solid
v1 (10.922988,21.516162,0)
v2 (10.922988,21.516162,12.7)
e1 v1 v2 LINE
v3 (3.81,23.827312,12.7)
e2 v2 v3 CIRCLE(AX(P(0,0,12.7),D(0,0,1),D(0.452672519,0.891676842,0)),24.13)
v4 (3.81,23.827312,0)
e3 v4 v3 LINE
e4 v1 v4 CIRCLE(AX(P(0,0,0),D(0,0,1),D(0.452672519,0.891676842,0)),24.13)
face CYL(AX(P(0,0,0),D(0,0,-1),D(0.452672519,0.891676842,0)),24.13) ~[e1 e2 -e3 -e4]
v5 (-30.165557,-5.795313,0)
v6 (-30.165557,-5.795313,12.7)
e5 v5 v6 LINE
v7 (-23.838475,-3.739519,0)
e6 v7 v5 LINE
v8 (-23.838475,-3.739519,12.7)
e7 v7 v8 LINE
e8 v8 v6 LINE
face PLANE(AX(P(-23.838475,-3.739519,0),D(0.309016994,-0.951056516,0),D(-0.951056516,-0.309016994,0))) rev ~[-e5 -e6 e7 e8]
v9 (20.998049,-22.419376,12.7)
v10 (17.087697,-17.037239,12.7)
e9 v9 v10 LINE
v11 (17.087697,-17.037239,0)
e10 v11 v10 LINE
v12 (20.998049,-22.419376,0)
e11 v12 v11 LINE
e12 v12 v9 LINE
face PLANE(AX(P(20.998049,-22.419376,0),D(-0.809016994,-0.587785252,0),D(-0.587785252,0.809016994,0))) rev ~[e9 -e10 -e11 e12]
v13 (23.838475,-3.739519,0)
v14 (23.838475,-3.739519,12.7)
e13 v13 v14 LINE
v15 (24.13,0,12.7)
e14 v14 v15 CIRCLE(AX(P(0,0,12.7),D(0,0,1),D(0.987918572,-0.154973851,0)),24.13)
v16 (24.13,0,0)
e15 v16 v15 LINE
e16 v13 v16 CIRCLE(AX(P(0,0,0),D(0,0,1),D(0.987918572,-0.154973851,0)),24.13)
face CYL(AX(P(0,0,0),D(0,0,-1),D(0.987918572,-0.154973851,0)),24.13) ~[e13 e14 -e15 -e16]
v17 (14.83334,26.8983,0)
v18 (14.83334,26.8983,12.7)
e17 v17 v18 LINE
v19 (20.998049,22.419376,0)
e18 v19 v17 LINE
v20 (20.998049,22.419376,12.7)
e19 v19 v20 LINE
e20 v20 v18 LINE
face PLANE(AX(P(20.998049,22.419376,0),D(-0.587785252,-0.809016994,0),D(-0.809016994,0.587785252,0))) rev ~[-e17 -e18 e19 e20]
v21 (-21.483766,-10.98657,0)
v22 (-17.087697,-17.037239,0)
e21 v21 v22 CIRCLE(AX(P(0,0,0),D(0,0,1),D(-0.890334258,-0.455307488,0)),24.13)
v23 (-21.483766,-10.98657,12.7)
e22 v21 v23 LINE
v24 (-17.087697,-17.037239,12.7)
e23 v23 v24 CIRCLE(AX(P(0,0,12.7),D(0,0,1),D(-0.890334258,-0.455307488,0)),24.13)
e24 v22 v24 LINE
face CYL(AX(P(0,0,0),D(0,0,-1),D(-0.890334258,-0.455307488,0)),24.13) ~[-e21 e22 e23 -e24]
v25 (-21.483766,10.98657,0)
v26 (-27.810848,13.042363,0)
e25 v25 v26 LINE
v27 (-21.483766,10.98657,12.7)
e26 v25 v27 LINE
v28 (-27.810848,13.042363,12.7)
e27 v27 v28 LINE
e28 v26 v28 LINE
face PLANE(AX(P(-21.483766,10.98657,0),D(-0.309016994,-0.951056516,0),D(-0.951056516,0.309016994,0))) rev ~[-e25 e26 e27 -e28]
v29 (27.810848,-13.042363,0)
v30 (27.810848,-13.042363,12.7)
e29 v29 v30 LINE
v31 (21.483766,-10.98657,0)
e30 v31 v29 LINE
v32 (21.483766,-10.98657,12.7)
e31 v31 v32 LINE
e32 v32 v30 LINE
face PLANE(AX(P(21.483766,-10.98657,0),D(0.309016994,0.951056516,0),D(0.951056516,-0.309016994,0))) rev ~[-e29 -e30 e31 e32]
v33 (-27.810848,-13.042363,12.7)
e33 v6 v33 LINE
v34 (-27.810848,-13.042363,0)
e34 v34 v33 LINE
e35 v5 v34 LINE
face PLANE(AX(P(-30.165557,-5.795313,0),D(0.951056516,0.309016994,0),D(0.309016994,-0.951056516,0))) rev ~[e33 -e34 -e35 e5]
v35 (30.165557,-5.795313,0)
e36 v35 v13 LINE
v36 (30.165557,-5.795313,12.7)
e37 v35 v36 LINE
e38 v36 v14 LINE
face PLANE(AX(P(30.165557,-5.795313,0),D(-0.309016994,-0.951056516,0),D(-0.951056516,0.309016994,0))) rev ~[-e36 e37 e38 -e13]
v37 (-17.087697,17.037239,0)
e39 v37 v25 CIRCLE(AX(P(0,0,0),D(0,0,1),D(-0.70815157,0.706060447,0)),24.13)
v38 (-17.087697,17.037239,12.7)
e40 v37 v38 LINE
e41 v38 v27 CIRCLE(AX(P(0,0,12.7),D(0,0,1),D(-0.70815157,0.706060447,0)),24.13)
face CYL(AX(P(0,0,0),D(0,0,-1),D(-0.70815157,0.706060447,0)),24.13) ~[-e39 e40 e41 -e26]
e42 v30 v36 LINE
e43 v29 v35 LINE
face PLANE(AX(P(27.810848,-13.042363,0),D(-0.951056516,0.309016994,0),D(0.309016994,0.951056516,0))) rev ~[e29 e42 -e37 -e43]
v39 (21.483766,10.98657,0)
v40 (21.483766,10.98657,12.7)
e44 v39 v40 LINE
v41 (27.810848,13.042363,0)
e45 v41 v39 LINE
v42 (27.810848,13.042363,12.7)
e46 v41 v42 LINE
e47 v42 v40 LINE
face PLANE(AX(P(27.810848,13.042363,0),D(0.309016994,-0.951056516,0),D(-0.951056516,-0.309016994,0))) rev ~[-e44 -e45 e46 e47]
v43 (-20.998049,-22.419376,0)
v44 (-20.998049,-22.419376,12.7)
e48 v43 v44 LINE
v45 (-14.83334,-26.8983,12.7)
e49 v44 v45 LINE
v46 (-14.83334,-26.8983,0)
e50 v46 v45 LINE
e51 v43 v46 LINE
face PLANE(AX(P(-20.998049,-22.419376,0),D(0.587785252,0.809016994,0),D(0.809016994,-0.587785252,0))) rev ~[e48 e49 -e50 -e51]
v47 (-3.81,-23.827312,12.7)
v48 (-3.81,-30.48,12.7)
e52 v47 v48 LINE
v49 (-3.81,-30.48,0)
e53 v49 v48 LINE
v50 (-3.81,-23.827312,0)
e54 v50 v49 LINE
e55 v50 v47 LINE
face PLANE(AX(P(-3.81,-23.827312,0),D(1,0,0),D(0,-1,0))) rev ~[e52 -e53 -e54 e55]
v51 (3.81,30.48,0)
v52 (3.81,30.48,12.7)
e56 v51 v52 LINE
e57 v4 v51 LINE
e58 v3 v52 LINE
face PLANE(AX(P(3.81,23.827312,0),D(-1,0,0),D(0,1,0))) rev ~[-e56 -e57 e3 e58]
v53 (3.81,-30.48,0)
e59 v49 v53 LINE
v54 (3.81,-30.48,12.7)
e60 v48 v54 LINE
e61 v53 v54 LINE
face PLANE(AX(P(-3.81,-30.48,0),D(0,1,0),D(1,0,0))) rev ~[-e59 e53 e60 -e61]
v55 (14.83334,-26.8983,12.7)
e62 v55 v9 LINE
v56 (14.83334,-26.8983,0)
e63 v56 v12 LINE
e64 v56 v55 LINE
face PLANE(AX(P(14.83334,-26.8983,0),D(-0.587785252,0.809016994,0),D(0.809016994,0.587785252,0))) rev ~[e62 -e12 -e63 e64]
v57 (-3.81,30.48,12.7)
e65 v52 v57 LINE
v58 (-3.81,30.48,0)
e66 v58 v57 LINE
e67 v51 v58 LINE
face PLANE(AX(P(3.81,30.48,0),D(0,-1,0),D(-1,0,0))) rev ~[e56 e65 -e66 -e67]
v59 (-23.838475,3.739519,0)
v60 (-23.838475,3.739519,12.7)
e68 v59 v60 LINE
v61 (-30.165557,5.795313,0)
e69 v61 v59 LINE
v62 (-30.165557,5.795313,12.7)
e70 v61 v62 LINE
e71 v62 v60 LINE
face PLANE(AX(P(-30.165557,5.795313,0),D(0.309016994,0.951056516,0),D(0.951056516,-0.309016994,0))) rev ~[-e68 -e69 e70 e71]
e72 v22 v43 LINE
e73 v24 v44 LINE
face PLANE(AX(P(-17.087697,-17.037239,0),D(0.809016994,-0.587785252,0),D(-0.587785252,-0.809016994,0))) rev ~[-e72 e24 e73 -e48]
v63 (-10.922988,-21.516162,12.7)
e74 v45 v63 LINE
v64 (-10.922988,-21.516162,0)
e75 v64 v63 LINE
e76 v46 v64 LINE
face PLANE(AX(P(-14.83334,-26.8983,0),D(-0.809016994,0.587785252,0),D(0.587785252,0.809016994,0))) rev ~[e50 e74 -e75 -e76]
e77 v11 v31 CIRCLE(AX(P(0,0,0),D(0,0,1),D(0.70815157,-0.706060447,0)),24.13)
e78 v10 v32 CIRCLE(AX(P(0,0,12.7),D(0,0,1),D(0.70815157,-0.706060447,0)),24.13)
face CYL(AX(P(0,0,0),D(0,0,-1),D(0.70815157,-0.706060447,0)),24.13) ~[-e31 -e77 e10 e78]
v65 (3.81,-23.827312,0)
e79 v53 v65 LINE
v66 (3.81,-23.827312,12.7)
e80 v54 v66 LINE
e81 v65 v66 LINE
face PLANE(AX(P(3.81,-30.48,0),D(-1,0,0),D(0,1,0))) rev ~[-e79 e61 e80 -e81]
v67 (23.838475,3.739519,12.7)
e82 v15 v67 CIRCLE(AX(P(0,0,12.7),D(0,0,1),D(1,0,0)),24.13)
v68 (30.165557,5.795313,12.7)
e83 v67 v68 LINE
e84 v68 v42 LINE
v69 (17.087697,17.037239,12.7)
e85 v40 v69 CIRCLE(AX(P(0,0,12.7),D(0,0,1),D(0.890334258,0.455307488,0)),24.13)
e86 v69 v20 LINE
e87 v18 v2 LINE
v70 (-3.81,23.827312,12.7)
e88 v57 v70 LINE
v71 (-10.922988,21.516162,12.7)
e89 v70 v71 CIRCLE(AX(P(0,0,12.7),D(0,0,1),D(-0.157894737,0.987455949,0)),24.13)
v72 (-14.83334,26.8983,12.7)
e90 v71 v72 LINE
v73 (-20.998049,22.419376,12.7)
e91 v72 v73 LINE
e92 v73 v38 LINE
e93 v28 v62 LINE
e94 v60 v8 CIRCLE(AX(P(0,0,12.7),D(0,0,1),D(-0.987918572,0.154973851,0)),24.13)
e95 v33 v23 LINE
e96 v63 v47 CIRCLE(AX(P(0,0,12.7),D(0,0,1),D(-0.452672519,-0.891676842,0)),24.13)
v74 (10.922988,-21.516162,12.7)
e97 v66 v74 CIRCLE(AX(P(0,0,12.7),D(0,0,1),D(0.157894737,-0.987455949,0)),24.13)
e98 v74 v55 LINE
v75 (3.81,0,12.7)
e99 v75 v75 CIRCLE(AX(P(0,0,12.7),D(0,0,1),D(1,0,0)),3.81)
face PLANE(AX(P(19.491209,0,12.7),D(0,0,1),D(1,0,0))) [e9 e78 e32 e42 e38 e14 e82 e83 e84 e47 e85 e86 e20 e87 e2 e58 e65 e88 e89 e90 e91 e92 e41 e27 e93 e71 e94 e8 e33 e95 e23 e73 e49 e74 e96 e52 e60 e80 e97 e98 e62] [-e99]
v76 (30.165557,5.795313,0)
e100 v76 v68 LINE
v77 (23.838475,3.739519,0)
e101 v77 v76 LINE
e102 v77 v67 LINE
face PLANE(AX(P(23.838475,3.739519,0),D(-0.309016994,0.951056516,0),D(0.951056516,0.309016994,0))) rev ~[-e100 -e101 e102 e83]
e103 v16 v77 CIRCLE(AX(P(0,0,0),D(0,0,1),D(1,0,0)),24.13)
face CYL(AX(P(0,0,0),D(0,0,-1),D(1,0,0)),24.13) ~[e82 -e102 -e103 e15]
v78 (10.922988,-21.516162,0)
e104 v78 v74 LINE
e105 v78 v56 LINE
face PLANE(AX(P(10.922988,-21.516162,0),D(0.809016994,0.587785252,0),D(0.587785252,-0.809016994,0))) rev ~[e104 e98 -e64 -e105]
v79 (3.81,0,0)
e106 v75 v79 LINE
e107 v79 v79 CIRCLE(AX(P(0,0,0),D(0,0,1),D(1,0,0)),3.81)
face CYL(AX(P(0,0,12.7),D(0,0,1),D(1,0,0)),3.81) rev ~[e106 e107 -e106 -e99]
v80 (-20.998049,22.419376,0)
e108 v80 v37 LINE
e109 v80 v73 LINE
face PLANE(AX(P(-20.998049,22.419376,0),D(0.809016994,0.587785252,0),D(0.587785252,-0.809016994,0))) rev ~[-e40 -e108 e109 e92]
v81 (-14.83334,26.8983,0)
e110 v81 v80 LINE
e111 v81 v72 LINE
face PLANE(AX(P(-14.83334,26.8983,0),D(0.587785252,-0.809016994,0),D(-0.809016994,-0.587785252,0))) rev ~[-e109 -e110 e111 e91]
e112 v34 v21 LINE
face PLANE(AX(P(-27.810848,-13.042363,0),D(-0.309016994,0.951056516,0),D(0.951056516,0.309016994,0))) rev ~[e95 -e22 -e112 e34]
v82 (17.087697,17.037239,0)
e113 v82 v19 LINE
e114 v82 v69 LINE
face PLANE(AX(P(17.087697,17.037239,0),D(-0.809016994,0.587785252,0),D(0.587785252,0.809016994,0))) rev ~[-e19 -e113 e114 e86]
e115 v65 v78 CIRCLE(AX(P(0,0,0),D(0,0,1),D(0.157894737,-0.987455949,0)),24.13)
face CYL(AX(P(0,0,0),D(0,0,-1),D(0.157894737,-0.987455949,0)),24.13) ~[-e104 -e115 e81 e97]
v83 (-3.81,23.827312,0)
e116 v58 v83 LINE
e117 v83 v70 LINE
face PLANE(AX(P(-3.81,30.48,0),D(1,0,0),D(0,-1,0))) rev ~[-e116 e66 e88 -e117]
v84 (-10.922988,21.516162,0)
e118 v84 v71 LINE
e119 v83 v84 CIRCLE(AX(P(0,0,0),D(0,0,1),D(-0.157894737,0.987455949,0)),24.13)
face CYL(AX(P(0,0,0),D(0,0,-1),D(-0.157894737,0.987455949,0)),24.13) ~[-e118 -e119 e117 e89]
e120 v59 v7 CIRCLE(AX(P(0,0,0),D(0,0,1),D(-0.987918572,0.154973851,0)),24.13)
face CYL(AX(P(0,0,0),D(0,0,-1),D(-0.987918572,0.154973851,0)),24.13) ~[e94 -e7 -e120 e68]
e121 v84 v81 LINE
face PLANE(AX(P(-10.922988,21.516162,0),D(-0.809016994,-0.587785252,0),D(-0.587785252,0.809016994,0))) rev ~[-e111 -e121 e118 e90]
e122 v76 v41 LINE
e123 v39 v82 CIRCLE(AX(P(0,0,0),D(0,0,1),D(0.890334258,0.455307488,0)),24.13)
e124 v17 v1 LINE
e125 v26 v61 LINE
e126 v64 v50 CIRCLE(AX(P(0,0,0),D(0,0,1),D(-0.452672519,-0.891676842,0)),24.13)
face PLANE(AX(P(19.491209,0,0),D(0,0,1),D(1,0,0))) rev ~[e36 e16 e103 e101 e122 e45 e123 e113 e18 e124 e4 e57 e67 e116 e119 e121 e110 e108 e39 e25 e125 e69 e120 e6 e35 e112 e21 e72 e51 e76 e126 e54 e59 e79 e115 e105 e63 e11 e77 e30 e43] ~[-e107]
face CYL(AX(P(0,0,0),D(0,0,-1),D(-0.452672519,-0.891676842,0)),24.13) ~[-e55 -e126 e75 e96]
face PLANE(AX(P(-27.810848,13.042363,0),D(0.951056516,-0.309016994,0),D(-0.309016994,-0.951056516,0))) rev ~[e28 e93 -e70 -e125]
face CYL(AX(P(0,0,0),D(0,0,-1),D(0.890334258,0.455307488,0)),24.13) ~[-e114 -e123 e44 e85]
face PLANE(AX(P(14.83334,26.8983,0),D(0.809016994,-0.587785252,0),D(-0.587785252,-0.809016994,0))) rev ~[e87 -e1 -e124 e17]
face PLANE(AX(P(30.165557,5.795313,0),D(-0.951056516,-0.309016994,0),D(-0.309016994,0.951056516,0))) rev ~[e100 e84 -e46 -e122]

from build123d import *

# Parameters (mm, degrees)
F1_DEPTH = 12.7
F2_R     = 3.81
F3_DEPTH = 25.4


# Not quite as in the source:
# - a feature names something its author has since deleted; it is built from what else it names


with BuildPart() as f1:
    # F0 (on Top) → F1 (new body)
    with BuildSketch(Plane.XY):
        with BuildLine():
            ThreePointArc((23.8384751489, -3.7395190297), (24.0570083899, -1.8754325709), (24.13, 0))
            ThreePointArc((24.13, 0), (24.0570083899, 1.8754325709), (23.8384751489, 3.7395190297))
            Line((23.8384751489, 3.7395190297), (12.3294189943, 0))
            Line((12.3294189943, 0), (23.8384751489, -3.7395190297))
        make_face()
        with BuildLine():
            Line((12.3294189943, 0), (23.8384751489, 3.7395190297))
            ThreePointArc((23.8384751489, 3.7395190297), (22.9489937382, 7.4565800743), (21.4837656518, 10.9865696839))
            Line((21.4837656518, 10.9865696839), (9.9747094971, 7.2470506542))
            Line((9.9747094971, 7.2470506542), (6.1647094971, 2.0030355372))
            Line((6.1647094971, 2.0030355372), (12.3294189943, 0))
        make_face()
        with BuildLine():
            ThreePointArc((21.4837656518, 10.9865696839), (22.9489937382, 7.4565800743), (23.8384751489, 3.7395190297))
            Line((23.8384751489, 3.7395190297), (30.1655573652, 5.7953126615))
            Line((30.1655573652, 5.7953126615), (27.8108478681, 13.0423633156))
            Line((27.8108478681, 13.0423633156), (21.4837656518, 10.9865696839))
        make_face()
        with BuildLine():
            Line((30.1655573652, -5.7953126615), (23.8384751489, -3.7395190297))
            ThreePointArc((23.8384751489, -3.7395190297), (22.9489937382, -7.4565800743), (21.4837656518, -10.9865696839))
            Line((21.4837656518, -10.9865696839), (27.8108478681, -13.0423633156))
            Line((27.8108478681, -13.0423633156), (30.1655573652, -5.7953126615))
        make_face()
        with BuildLine():
            ThreePointArc((21.4837656518, -10.9865696839), (22.9489937382, -7.4565800743), (23.8384751489, -3.7395190297))
            Line((23.8384751489, -3.7395190297), (12.3294189943, 0))
            Line((12.3294189943, 0), (6.1647094971, -2.0030355372))
            Line((6.1647094971, -2.0030355372), (9.9747094971, -7.2470506542))
            Line((9.9747094971, -7.2470506542), (21.4837656518, -10.9865696839))
        make_face()
        with BuildLine():
            Line((9.9747094971, 7.2470506542), (21.4837656518, 10.9865696839))
            ThreePointArc((21.4837656518, 10.9865696839), (19.5215800743, 14.1832581378), (17.0876973792, 17.0372385755))
            Line((17.0876973792, 17.0372385755), (9.9747094971, 7.2470506542))
        make_face()
        with BuildLine():
            ThreePointArc((17.0876973792, -17.0372385755), (19.5215800743, -14.1832581378), (21.4837656518, -10.9865696839))
            Line((21.4837656518, -10.9865696839), (9.9747094971, -7.2470506542))
            Line((9.9747094971, -7.2470506542), (17.0876973792, -17.0372385755))
        make_face()
        with BuildLine():
            Line((9.9747094971, 7.2470506542), (17.0876973792, 17.0372385755))
            ThreePointArc((17.0876973792, 17.0372385755), (14.1832581378, 19.5215800743), (10.922987882, 21.516162198))
            Line((10.922987882, 21.516162198), (3.81, 11.7259742766))
            Line((3.81, 11.7259742766), (3.81, 5.244015117))
            Line((3.81, 5.244015117), (9.9747094971, 7.2470506542))
        make_face()
        with BuildLine():
            ThreePointArc((10.922987882, 21.516162198), (14.1832581378, 19.5215800743), (17.0876973792, 17.0372385755))
            Line((17.0876973792, 17.0372385755), (20.9980492384, 22.4193761773))
            Line((20.9980492384, 22.4193761773), (14.8333397413, 26.8982997998))
            Line((14.8333397413, 26.8982997998), (10.922987882, 21.516162198))
        make_face()
        with BuildLine():
            Line((20.9980492384, -22.4193761773), (17.0876973792, -17.0372385755))
            ThreePointArc((17.0876973792, -17.0372385755), (14.1832581378, -19.5215800743), (10.922987882, -21.516162198))
            Line((10.922987882, -21.516162198), (14.8333397413, -26.8982997998))
            Line((14.8333397413, -26.8982997998), (20.9980492384, -22.4193761773))
        make_face()
        with BuildLine():
            ThreePointArc((10.922987882, -21.516162198), (14.1832581378, -19.5215800743), (17.0876973792, -17.0372385755))
            Line((17.0876973792, -17.0372385755), (9.9747094971, -7.2470506542))
            Line((9.9747094971, -7.2470506542), (3.81, -5.244015117))
            Line((3.81, -5.244015117), (3.81, -11.7259742766))
            Line((3.81, -11.7259742766), (10.922987882, -21.516162198))
        make_face()
        with BuildLine():
            Line((3.81, 11.7259742766), (10.922987882, 21.516162198))
            ThreePointArc((10.922987882, 21.516162198), (7.4565800743, 22.9489937382), (3.81, 23.8273120599))
            Line((3.81, 23.8273120599), (3.81, 11.7259742766))
        make_face()
        with BuildLine():
            ThreePointArc((3.81, -23.8273120599), (7.4565800743, -22.9489937382), (10.922987882, -21.516162198))
            Line((10.922987882, -21.516162198), (3.81, -11.7259742766))
            Line((3.81, -11.7259742766), (3.81, -23.8273120599))
        make_face()
        with BuildLine():
            Line((3.81, 11.7259742766), (3.81, 23.8273120599))
            ThreePointArc((3.81, 23.8273120599), (0, 24.13), (-3.81, 23.8273120599))
            Line((-3.81, 23.8273120599), (-3.81, 11.7259742766))
            Line((-3.81, 11.7259742766), (0, 6.4819591596))
            Line((0, 6.4819591596), (3.81, 11.7259742766))
        make_face()
        with BuildLine():
            ThreePointArc((-3.81, 23.8273120599), (0, 24.13), (3.81, 23.8273120599))
            Line((3.81, 23.8273120599), (3.81, 30.48))
            Line((3.81, 30.48), (-3.81, 30.48))
            Line((-3.81, 30.48), (-3.81, 23.8273120599))
        make_face()
        with BuildLine():
            Line((3.81, -30.48), (3.81, -23.8273120599))
            ThreePointArc((3.81, -23.8273120599), (0, -24.13), (-3.81, -23.8273120599))
            Line((-3.81, -23.8273120599), (-3.81, -30.48))
            Line((-3.81, -30.48), (3.81, -30.48))
        make_face()
        with BuildLine():
            ThreePointArc((-3.81, -23.8273120599), (0, -24.13), (3.81, -23.8273120599))
            Line((3.81, -23.8273120599), (3.81, -11.7259742766))
            Line((3.81, -11.7259742766), (0, -6.4819591596))
            Line((0, -6.4819591596), (-3.81, -11.7259742766))
            Line((-3.81, -11.7259742766), (-3.81, -23.8273120599))
        make_face()
        with BuildLine():
            Line((-3.81, 11.7259742766), (-3.81, 23.8273120599))
            ThreePointArc((-3.81, 23.8273120599), (-7.4565800743, 22.9489937382), (-10.922987882, 21.516162198))
            Line((-10.922987882, 21.516162198), (-3.81, 11.7259742766))
        make_face()
        with BuildLine():
            ThreePointArc((-10.922987882, -21.516162198), (-7.4565800743, -22.9489937382), (-3.81, -23.8273120599))
            Line((-3.81, -23.8273120599), (-3.81, -11.7259742766))
            Line((-3.81, -11.7259742766), (-10.922987882, -21.516162198))
        make_face()
        with BuildLine():
            Line((-3.81, 11.7259742766), (-10.922987882, 21.516162198))
            ThreePointArc((-10.922987882, 21.516162198), (-14.1832581378, 19.5215800743), (-17.0876973792, 17.0372385755))
            Line((-17.0876973792, 17.0372385755), (-9.9747094971, 7.2470506542))
            Line((-9.9747094971, 7.2470506542), (-3.81, 5.244015117))
            Line((-3.81, 5.244015117), (-3.81, 11.7259742766))
        make_face()
        with BuildLine():
            ThreePointArc((-17.0876973792, 17.0372385755), (-14.1832581378, 19.5215800743), (-10.922987882, 21.516162198))
            Line((-10.922987882, 21.516162198), (-14.8333397413, 26.8982997998))
            Line((-14.8333397413, 26.8982997998), (-20.9980492384, 22.4193761773))
            Line((-20.9980492384, 22.4193761773), (-17.0876973792, 17.0372385755))
        make_face()
        with BuildLine():
            Line((-14.8333397413, -26.8982997998), (-10.922987882, -21.516162198))
            ThreePointArc((-10.922987882, -21.516162198), (-14.1832581378, -19.5215800743), (-17.0876973792, -17.0372385755))
            Line((-17.0876973792, -17.0372385755), (-20.9980492384, -22.4193761773))
            Line((-20.9980492384, -22.4193761773), (-14.8333397413, -26.8982997998))
        make_face()
        with BuildLine():
            ThreePointArc((-17.0876973792, -17.0372385755), (-14.1832581378, -19.5215800743), (-10.922987882, -21.516162198))
            Line((-10.922987882, -21.516162198), (-3.81, -11.7259742766))
            Line((-3.81, -11.7259742766), (-3.81, -5.244015117))
            Line((-3.81, -5.244015117), (-9.9747094971, -7.2470506542))
            Line((-9.9747094971, -7.2470506542), (-17.0876973792, -17.0372385755))
        make_face()
        with BuildLine():
            Line((-9.9747094971, 7.2470506542), (-17.0876973792, 17.0372385755))
            ThreePointArc((-17.0876973792, 17.0372385755), (-19.5215800743, 14.1832581378), (-21.4837656518, 10.9865696839))
            Line((-21.4837656518, 10.9865696839), (-9.9747094971, 7.2470506542))
        make_face()
        with BuildLine():
            ThreePointArc((-21.4837656518, -10.9865696839), (-19.5215800743, -14.1832581378), (-17.0876973792, -17.0372385755))
            Line((-17.0876973792, -17.0372385755), (-9.9747094971, -7.2470506542))
            Line((-9.9747094971, -7.2470506542), (-21.4837656518, -10.9865696839))
        make_face()
        with BuildLine():
            Line((-9.9747094971, 7.2470506542), (-21.4837656518, 10.9865696839))
            ThreePointArc((-21.4837656518, 10.9865696839), (-22.9489937382, 7.4565800743), (-23.8384751489, 3.7395190297))
            Line((-23.8384751489, 3.7395190297), (-12.3294189943, 0))
            Line((-12.3294189943, 0), (-6.1647094971, 2.0030355372))
            Line((-6.1647094971, 2.0030355372), (-9.9747094971, 7.2470506542))
        make_face()
        with BuildLine():
            ThreePointArc((-23.8384751489, 3.7395190297), (-22.9489937382, 7.4565800743), (-21.4837656518, 10.9865696839))
            Line((-21.4837656518, 10.9865696839), (-27.8108478681, 13.0423633156))
            Line((-27.8108478681, 13.0423633156), (-30.1655573652, 5.7953126615))
            Line((-30.1655573652, 5.7953126615), (-23.8384751489, 3.7395190297))
        make_face()
        with BuildLine():
            Line((-27.8108478681, -13.0423633156), (-21.4837656518, -10.9865696839))
            ThreePointArc((-21.4837656518, -10.9865696839), (-22.9489937382, -7.4565800743), (-23.8384751489, -3.7395190297))
            Line((-23.8384751489, -3.7395190297), (-30.1655573652, -5.7953126615))
            Line((-30.1655573652, -5.7953126615), (-27.8108478681, -13.0423633156))
        make_face()
        with BuildLine():
            ThreePointArc((-23.8384751489, -3.7395190297), (-22.9489937382, -7.4565800743), (-21.4837656518, -10.9865696839))
            Line((-21.4837656518, -10.9865696839), (-9.9747094971, -7.2470506542))
            Line((-9.9747094971, -7.2470506542), (-6.1647094971, -2.0030355372))
            Line((-6.1647094971, -2.0030355372), (-12.3294189943, 0))
            Line((-12.3294189943, 0), (-23.8384751489, -3.7395190297))
        make_face()
        with BuildLine():
            Line((-12.3294189943, 0), (-23.8384751489, 3.7395190297))
            ThreePointArc((-23.8384751489, 3.7395190297), (-24.13, 0), (-23.8384751489, -3.7395190297))
            Line((-23.8384751489, -3.7395190297), (-12.3294189943, 0))
        make_face()
        Polygon((0, -6.4819591596), (1.4552905029, -4.4789236225), (0, -4.0060710743), (-1.4552905029, -4.4789236225), align=None)
        Polygon((-3.81, -5.244015117), (-1.4552905029, -4.4789236225), (-2.3547094971, -3.2409795798), (-3.81, -2.7681270317), align=None)
        Polygon((-3.81, -2.7681270317), (-3.81, -1.2379440426), (-4.7094189943, 0), (-6.1647094971, -2.0030355372), align=None)
        Polygon((-3.81, 1.2379440426), (-3.81, 2.7681270317), (-6.1647094971, 2.0030355372), (-4.7094189943, 0), align=None)
        Polygon((3.81, -5.244015117), (3.81, -2.7681270317), (2.3547094971, -3.2409795798), (1.4552905029, -4.4789236225), align=None)
        Polygon((3.81, -2.7681270317), (6.1647094971, -2.0030355372), (4.7094189943, 0), (3.81, -1.2379440426), align=None)
        Polygon((6.1647094971, -2.0030355372), (12.3294189943, 0), (6.1647094971, 2.0030355372), (4.7094189943, 0), align=None)
        Polygon((9.9747094971, -7.2470506542), (6.1647094971, -2.0030355372), (3.81, -2.7681270317), (3.81, -5.244015117), align=None)
        Polygon((2.3547094971, -3.2409795798), (3.81, -2.7681270317), (3.81, -1.2379440426), (3.0823547486, -2.2394618112), align=None)
        Polygon((3.81, -11.7259742766), (3.81, -5.244015117), (1.4552905029, -4.4789236225), (0, -6.4819591596), align=None)
        Polygon((1.4552905029, -4.4789236225), (2.3547094971, -3.2409795798), (1.1773547486, -3.6235253271), (0, -4.0060710743), align=None)
        Polygon((-3.81, -11.7259742766), (0, -6.4819591596), (-1.4552905029, -4.4789236225), (-3.81, -5.244015117), align=None)
        Polygon((-1.4552905029, -4.4789236225), (0, -4.0060710743), (-1.1773547486, -3.6235253271), (-2.3547094971, -3.2409795798), align=None)
        Polygon((-9.9747094971, -7.2470506542), (-3.81, -5.244015117), (-3.81, -2.7681270317), (-6.1647094971, -2.0030355372), align=None)
        Polygon((-3.81, -2.7681270317), (-2.3547094971, -3.2409795798), (-3.0823547486, -2.2394618112), (-3.81, -1.2379440426), align=None)
        Polygon((-4.7094189943, 0), (-6.1647094971, 2.0030355372), (-12.3294189943, 0), (-6.1647094971, -2.0030355372), align=None)
        Polygon((-3.81, -1.2379440426), (-3.81, 0), (-3.81, 1.2379440426), (-4.7094189943, 0), align=None)
        Polygon((-3.81, 2.7681270317), (-3.81, 5.244015117), (-9.9747094971, 7.2470506542), (-6.1647094971, 2.0030355372), align=None)
        Polygon((-3.0823547486, 2.2394618112), (-2.3547094971, 3.2409795798), (-3.81, 2.7681270317), (-3.81, 1.2379440426), align=None)
        Polygon((-1.4552905029, 4.4789236225), (0, 6.4819591596), (-3.81, 11.7259742766), (-3.81, 5.244015117), align=None)
        Polygon((-2.3547094971, 3.2409795798), (-1.4552905029, 4.4789236225), (-3.81, 5.244015117), (-3.81, 2.7681270317), align=None)
        Polygon((6.1647094971, 2.0030355372), (9.9747094971, 7.2470506542), (3.81, 5.244015117), (3.81, 2.7681270317), align=None)
        Polygon((1.4552905029, 4.4789236225), (3.81, 5.244015117), (3.81, 11.7259742766), (0, 6.4819591596), align=None)
        Polygon((-1.1773547486, 3.6235253271), (0, 4.0060710743), (-1.4552905029, 4.4789236225), (-2.3547094971, 3.2409795798), align=None)
        Polygon((0, 4.0060710743), (1.4552905029, 4.4789236225), (0, 6.4819591596), (-1.4552905029, 4.4789236225), align=None)
        Polygon((2.3547094971, 3.2409795798), (1.4552905029, 4.4789236225), (0, 4.0060710743), (1.1773547486, 3.6235253271), align=None)
        Polygon((3.81, 1.2379440426), (3.81, 2.7681270317), (2.3547094971, 3.2409795798), (3.0823547486, 2.2394618112), align=None)
        Polygon((4.7094189943, 0), (6.1647094971, 2.0030355372), (3.81, 2.7681270317), (3.81, 1.2379440426), align=None)
        Polygon((3.81, -1.2379440426), (4.7094189943, 0), (3.81, 1.2379440426), (3.81, 0), align=None)
        Polygon((3.81, 2.7681270317), (3.81, 5.244015117), (1.4552905029, 4.4789236225), (2.3547094971, 3.2409795798), align=None)
        Polygon((3.81, 0), (3.81, 1.2379440426), (3.0823547486, 2.2394618112), (2.3547094971, 3.2409795798), (1.1773547486, 3.6235253271), (0, 4.0060710743), (-1.1773547486, 3.6235253271), (-2.3547094971, 3.2409795798), (-3.0823547486, 2.2394618112), (-3.81, 1.2379440426), (-3.81, 0), (0, 0), align=None)
        Polygon((3.0823547486, -2.2394618112), (3.81, -1.2379440426), (3.81, 0), (0, 0), (-3.81, 0), (-3.81, -1.2379440426), (-3.0823547486, -2.2394618112), (-2.3547094971, -3.2409795798), (-1.1773547486, -3.6235253271), (0, -4.0060710743), (1.1773547486, -3.6235253271), (2.3547094971, -3.2409795798), align=None)
    extrude(amount=F1_DEPTH)

    # F2 (on face) → F3 (cut)
    with BuildSketch(Plane.XY.offset(12.7)):
        Circle(F2_R)
    extrude(amount=-F3_DEPTH, mode=Mode.SUBTRACT)


solid = f1.part
